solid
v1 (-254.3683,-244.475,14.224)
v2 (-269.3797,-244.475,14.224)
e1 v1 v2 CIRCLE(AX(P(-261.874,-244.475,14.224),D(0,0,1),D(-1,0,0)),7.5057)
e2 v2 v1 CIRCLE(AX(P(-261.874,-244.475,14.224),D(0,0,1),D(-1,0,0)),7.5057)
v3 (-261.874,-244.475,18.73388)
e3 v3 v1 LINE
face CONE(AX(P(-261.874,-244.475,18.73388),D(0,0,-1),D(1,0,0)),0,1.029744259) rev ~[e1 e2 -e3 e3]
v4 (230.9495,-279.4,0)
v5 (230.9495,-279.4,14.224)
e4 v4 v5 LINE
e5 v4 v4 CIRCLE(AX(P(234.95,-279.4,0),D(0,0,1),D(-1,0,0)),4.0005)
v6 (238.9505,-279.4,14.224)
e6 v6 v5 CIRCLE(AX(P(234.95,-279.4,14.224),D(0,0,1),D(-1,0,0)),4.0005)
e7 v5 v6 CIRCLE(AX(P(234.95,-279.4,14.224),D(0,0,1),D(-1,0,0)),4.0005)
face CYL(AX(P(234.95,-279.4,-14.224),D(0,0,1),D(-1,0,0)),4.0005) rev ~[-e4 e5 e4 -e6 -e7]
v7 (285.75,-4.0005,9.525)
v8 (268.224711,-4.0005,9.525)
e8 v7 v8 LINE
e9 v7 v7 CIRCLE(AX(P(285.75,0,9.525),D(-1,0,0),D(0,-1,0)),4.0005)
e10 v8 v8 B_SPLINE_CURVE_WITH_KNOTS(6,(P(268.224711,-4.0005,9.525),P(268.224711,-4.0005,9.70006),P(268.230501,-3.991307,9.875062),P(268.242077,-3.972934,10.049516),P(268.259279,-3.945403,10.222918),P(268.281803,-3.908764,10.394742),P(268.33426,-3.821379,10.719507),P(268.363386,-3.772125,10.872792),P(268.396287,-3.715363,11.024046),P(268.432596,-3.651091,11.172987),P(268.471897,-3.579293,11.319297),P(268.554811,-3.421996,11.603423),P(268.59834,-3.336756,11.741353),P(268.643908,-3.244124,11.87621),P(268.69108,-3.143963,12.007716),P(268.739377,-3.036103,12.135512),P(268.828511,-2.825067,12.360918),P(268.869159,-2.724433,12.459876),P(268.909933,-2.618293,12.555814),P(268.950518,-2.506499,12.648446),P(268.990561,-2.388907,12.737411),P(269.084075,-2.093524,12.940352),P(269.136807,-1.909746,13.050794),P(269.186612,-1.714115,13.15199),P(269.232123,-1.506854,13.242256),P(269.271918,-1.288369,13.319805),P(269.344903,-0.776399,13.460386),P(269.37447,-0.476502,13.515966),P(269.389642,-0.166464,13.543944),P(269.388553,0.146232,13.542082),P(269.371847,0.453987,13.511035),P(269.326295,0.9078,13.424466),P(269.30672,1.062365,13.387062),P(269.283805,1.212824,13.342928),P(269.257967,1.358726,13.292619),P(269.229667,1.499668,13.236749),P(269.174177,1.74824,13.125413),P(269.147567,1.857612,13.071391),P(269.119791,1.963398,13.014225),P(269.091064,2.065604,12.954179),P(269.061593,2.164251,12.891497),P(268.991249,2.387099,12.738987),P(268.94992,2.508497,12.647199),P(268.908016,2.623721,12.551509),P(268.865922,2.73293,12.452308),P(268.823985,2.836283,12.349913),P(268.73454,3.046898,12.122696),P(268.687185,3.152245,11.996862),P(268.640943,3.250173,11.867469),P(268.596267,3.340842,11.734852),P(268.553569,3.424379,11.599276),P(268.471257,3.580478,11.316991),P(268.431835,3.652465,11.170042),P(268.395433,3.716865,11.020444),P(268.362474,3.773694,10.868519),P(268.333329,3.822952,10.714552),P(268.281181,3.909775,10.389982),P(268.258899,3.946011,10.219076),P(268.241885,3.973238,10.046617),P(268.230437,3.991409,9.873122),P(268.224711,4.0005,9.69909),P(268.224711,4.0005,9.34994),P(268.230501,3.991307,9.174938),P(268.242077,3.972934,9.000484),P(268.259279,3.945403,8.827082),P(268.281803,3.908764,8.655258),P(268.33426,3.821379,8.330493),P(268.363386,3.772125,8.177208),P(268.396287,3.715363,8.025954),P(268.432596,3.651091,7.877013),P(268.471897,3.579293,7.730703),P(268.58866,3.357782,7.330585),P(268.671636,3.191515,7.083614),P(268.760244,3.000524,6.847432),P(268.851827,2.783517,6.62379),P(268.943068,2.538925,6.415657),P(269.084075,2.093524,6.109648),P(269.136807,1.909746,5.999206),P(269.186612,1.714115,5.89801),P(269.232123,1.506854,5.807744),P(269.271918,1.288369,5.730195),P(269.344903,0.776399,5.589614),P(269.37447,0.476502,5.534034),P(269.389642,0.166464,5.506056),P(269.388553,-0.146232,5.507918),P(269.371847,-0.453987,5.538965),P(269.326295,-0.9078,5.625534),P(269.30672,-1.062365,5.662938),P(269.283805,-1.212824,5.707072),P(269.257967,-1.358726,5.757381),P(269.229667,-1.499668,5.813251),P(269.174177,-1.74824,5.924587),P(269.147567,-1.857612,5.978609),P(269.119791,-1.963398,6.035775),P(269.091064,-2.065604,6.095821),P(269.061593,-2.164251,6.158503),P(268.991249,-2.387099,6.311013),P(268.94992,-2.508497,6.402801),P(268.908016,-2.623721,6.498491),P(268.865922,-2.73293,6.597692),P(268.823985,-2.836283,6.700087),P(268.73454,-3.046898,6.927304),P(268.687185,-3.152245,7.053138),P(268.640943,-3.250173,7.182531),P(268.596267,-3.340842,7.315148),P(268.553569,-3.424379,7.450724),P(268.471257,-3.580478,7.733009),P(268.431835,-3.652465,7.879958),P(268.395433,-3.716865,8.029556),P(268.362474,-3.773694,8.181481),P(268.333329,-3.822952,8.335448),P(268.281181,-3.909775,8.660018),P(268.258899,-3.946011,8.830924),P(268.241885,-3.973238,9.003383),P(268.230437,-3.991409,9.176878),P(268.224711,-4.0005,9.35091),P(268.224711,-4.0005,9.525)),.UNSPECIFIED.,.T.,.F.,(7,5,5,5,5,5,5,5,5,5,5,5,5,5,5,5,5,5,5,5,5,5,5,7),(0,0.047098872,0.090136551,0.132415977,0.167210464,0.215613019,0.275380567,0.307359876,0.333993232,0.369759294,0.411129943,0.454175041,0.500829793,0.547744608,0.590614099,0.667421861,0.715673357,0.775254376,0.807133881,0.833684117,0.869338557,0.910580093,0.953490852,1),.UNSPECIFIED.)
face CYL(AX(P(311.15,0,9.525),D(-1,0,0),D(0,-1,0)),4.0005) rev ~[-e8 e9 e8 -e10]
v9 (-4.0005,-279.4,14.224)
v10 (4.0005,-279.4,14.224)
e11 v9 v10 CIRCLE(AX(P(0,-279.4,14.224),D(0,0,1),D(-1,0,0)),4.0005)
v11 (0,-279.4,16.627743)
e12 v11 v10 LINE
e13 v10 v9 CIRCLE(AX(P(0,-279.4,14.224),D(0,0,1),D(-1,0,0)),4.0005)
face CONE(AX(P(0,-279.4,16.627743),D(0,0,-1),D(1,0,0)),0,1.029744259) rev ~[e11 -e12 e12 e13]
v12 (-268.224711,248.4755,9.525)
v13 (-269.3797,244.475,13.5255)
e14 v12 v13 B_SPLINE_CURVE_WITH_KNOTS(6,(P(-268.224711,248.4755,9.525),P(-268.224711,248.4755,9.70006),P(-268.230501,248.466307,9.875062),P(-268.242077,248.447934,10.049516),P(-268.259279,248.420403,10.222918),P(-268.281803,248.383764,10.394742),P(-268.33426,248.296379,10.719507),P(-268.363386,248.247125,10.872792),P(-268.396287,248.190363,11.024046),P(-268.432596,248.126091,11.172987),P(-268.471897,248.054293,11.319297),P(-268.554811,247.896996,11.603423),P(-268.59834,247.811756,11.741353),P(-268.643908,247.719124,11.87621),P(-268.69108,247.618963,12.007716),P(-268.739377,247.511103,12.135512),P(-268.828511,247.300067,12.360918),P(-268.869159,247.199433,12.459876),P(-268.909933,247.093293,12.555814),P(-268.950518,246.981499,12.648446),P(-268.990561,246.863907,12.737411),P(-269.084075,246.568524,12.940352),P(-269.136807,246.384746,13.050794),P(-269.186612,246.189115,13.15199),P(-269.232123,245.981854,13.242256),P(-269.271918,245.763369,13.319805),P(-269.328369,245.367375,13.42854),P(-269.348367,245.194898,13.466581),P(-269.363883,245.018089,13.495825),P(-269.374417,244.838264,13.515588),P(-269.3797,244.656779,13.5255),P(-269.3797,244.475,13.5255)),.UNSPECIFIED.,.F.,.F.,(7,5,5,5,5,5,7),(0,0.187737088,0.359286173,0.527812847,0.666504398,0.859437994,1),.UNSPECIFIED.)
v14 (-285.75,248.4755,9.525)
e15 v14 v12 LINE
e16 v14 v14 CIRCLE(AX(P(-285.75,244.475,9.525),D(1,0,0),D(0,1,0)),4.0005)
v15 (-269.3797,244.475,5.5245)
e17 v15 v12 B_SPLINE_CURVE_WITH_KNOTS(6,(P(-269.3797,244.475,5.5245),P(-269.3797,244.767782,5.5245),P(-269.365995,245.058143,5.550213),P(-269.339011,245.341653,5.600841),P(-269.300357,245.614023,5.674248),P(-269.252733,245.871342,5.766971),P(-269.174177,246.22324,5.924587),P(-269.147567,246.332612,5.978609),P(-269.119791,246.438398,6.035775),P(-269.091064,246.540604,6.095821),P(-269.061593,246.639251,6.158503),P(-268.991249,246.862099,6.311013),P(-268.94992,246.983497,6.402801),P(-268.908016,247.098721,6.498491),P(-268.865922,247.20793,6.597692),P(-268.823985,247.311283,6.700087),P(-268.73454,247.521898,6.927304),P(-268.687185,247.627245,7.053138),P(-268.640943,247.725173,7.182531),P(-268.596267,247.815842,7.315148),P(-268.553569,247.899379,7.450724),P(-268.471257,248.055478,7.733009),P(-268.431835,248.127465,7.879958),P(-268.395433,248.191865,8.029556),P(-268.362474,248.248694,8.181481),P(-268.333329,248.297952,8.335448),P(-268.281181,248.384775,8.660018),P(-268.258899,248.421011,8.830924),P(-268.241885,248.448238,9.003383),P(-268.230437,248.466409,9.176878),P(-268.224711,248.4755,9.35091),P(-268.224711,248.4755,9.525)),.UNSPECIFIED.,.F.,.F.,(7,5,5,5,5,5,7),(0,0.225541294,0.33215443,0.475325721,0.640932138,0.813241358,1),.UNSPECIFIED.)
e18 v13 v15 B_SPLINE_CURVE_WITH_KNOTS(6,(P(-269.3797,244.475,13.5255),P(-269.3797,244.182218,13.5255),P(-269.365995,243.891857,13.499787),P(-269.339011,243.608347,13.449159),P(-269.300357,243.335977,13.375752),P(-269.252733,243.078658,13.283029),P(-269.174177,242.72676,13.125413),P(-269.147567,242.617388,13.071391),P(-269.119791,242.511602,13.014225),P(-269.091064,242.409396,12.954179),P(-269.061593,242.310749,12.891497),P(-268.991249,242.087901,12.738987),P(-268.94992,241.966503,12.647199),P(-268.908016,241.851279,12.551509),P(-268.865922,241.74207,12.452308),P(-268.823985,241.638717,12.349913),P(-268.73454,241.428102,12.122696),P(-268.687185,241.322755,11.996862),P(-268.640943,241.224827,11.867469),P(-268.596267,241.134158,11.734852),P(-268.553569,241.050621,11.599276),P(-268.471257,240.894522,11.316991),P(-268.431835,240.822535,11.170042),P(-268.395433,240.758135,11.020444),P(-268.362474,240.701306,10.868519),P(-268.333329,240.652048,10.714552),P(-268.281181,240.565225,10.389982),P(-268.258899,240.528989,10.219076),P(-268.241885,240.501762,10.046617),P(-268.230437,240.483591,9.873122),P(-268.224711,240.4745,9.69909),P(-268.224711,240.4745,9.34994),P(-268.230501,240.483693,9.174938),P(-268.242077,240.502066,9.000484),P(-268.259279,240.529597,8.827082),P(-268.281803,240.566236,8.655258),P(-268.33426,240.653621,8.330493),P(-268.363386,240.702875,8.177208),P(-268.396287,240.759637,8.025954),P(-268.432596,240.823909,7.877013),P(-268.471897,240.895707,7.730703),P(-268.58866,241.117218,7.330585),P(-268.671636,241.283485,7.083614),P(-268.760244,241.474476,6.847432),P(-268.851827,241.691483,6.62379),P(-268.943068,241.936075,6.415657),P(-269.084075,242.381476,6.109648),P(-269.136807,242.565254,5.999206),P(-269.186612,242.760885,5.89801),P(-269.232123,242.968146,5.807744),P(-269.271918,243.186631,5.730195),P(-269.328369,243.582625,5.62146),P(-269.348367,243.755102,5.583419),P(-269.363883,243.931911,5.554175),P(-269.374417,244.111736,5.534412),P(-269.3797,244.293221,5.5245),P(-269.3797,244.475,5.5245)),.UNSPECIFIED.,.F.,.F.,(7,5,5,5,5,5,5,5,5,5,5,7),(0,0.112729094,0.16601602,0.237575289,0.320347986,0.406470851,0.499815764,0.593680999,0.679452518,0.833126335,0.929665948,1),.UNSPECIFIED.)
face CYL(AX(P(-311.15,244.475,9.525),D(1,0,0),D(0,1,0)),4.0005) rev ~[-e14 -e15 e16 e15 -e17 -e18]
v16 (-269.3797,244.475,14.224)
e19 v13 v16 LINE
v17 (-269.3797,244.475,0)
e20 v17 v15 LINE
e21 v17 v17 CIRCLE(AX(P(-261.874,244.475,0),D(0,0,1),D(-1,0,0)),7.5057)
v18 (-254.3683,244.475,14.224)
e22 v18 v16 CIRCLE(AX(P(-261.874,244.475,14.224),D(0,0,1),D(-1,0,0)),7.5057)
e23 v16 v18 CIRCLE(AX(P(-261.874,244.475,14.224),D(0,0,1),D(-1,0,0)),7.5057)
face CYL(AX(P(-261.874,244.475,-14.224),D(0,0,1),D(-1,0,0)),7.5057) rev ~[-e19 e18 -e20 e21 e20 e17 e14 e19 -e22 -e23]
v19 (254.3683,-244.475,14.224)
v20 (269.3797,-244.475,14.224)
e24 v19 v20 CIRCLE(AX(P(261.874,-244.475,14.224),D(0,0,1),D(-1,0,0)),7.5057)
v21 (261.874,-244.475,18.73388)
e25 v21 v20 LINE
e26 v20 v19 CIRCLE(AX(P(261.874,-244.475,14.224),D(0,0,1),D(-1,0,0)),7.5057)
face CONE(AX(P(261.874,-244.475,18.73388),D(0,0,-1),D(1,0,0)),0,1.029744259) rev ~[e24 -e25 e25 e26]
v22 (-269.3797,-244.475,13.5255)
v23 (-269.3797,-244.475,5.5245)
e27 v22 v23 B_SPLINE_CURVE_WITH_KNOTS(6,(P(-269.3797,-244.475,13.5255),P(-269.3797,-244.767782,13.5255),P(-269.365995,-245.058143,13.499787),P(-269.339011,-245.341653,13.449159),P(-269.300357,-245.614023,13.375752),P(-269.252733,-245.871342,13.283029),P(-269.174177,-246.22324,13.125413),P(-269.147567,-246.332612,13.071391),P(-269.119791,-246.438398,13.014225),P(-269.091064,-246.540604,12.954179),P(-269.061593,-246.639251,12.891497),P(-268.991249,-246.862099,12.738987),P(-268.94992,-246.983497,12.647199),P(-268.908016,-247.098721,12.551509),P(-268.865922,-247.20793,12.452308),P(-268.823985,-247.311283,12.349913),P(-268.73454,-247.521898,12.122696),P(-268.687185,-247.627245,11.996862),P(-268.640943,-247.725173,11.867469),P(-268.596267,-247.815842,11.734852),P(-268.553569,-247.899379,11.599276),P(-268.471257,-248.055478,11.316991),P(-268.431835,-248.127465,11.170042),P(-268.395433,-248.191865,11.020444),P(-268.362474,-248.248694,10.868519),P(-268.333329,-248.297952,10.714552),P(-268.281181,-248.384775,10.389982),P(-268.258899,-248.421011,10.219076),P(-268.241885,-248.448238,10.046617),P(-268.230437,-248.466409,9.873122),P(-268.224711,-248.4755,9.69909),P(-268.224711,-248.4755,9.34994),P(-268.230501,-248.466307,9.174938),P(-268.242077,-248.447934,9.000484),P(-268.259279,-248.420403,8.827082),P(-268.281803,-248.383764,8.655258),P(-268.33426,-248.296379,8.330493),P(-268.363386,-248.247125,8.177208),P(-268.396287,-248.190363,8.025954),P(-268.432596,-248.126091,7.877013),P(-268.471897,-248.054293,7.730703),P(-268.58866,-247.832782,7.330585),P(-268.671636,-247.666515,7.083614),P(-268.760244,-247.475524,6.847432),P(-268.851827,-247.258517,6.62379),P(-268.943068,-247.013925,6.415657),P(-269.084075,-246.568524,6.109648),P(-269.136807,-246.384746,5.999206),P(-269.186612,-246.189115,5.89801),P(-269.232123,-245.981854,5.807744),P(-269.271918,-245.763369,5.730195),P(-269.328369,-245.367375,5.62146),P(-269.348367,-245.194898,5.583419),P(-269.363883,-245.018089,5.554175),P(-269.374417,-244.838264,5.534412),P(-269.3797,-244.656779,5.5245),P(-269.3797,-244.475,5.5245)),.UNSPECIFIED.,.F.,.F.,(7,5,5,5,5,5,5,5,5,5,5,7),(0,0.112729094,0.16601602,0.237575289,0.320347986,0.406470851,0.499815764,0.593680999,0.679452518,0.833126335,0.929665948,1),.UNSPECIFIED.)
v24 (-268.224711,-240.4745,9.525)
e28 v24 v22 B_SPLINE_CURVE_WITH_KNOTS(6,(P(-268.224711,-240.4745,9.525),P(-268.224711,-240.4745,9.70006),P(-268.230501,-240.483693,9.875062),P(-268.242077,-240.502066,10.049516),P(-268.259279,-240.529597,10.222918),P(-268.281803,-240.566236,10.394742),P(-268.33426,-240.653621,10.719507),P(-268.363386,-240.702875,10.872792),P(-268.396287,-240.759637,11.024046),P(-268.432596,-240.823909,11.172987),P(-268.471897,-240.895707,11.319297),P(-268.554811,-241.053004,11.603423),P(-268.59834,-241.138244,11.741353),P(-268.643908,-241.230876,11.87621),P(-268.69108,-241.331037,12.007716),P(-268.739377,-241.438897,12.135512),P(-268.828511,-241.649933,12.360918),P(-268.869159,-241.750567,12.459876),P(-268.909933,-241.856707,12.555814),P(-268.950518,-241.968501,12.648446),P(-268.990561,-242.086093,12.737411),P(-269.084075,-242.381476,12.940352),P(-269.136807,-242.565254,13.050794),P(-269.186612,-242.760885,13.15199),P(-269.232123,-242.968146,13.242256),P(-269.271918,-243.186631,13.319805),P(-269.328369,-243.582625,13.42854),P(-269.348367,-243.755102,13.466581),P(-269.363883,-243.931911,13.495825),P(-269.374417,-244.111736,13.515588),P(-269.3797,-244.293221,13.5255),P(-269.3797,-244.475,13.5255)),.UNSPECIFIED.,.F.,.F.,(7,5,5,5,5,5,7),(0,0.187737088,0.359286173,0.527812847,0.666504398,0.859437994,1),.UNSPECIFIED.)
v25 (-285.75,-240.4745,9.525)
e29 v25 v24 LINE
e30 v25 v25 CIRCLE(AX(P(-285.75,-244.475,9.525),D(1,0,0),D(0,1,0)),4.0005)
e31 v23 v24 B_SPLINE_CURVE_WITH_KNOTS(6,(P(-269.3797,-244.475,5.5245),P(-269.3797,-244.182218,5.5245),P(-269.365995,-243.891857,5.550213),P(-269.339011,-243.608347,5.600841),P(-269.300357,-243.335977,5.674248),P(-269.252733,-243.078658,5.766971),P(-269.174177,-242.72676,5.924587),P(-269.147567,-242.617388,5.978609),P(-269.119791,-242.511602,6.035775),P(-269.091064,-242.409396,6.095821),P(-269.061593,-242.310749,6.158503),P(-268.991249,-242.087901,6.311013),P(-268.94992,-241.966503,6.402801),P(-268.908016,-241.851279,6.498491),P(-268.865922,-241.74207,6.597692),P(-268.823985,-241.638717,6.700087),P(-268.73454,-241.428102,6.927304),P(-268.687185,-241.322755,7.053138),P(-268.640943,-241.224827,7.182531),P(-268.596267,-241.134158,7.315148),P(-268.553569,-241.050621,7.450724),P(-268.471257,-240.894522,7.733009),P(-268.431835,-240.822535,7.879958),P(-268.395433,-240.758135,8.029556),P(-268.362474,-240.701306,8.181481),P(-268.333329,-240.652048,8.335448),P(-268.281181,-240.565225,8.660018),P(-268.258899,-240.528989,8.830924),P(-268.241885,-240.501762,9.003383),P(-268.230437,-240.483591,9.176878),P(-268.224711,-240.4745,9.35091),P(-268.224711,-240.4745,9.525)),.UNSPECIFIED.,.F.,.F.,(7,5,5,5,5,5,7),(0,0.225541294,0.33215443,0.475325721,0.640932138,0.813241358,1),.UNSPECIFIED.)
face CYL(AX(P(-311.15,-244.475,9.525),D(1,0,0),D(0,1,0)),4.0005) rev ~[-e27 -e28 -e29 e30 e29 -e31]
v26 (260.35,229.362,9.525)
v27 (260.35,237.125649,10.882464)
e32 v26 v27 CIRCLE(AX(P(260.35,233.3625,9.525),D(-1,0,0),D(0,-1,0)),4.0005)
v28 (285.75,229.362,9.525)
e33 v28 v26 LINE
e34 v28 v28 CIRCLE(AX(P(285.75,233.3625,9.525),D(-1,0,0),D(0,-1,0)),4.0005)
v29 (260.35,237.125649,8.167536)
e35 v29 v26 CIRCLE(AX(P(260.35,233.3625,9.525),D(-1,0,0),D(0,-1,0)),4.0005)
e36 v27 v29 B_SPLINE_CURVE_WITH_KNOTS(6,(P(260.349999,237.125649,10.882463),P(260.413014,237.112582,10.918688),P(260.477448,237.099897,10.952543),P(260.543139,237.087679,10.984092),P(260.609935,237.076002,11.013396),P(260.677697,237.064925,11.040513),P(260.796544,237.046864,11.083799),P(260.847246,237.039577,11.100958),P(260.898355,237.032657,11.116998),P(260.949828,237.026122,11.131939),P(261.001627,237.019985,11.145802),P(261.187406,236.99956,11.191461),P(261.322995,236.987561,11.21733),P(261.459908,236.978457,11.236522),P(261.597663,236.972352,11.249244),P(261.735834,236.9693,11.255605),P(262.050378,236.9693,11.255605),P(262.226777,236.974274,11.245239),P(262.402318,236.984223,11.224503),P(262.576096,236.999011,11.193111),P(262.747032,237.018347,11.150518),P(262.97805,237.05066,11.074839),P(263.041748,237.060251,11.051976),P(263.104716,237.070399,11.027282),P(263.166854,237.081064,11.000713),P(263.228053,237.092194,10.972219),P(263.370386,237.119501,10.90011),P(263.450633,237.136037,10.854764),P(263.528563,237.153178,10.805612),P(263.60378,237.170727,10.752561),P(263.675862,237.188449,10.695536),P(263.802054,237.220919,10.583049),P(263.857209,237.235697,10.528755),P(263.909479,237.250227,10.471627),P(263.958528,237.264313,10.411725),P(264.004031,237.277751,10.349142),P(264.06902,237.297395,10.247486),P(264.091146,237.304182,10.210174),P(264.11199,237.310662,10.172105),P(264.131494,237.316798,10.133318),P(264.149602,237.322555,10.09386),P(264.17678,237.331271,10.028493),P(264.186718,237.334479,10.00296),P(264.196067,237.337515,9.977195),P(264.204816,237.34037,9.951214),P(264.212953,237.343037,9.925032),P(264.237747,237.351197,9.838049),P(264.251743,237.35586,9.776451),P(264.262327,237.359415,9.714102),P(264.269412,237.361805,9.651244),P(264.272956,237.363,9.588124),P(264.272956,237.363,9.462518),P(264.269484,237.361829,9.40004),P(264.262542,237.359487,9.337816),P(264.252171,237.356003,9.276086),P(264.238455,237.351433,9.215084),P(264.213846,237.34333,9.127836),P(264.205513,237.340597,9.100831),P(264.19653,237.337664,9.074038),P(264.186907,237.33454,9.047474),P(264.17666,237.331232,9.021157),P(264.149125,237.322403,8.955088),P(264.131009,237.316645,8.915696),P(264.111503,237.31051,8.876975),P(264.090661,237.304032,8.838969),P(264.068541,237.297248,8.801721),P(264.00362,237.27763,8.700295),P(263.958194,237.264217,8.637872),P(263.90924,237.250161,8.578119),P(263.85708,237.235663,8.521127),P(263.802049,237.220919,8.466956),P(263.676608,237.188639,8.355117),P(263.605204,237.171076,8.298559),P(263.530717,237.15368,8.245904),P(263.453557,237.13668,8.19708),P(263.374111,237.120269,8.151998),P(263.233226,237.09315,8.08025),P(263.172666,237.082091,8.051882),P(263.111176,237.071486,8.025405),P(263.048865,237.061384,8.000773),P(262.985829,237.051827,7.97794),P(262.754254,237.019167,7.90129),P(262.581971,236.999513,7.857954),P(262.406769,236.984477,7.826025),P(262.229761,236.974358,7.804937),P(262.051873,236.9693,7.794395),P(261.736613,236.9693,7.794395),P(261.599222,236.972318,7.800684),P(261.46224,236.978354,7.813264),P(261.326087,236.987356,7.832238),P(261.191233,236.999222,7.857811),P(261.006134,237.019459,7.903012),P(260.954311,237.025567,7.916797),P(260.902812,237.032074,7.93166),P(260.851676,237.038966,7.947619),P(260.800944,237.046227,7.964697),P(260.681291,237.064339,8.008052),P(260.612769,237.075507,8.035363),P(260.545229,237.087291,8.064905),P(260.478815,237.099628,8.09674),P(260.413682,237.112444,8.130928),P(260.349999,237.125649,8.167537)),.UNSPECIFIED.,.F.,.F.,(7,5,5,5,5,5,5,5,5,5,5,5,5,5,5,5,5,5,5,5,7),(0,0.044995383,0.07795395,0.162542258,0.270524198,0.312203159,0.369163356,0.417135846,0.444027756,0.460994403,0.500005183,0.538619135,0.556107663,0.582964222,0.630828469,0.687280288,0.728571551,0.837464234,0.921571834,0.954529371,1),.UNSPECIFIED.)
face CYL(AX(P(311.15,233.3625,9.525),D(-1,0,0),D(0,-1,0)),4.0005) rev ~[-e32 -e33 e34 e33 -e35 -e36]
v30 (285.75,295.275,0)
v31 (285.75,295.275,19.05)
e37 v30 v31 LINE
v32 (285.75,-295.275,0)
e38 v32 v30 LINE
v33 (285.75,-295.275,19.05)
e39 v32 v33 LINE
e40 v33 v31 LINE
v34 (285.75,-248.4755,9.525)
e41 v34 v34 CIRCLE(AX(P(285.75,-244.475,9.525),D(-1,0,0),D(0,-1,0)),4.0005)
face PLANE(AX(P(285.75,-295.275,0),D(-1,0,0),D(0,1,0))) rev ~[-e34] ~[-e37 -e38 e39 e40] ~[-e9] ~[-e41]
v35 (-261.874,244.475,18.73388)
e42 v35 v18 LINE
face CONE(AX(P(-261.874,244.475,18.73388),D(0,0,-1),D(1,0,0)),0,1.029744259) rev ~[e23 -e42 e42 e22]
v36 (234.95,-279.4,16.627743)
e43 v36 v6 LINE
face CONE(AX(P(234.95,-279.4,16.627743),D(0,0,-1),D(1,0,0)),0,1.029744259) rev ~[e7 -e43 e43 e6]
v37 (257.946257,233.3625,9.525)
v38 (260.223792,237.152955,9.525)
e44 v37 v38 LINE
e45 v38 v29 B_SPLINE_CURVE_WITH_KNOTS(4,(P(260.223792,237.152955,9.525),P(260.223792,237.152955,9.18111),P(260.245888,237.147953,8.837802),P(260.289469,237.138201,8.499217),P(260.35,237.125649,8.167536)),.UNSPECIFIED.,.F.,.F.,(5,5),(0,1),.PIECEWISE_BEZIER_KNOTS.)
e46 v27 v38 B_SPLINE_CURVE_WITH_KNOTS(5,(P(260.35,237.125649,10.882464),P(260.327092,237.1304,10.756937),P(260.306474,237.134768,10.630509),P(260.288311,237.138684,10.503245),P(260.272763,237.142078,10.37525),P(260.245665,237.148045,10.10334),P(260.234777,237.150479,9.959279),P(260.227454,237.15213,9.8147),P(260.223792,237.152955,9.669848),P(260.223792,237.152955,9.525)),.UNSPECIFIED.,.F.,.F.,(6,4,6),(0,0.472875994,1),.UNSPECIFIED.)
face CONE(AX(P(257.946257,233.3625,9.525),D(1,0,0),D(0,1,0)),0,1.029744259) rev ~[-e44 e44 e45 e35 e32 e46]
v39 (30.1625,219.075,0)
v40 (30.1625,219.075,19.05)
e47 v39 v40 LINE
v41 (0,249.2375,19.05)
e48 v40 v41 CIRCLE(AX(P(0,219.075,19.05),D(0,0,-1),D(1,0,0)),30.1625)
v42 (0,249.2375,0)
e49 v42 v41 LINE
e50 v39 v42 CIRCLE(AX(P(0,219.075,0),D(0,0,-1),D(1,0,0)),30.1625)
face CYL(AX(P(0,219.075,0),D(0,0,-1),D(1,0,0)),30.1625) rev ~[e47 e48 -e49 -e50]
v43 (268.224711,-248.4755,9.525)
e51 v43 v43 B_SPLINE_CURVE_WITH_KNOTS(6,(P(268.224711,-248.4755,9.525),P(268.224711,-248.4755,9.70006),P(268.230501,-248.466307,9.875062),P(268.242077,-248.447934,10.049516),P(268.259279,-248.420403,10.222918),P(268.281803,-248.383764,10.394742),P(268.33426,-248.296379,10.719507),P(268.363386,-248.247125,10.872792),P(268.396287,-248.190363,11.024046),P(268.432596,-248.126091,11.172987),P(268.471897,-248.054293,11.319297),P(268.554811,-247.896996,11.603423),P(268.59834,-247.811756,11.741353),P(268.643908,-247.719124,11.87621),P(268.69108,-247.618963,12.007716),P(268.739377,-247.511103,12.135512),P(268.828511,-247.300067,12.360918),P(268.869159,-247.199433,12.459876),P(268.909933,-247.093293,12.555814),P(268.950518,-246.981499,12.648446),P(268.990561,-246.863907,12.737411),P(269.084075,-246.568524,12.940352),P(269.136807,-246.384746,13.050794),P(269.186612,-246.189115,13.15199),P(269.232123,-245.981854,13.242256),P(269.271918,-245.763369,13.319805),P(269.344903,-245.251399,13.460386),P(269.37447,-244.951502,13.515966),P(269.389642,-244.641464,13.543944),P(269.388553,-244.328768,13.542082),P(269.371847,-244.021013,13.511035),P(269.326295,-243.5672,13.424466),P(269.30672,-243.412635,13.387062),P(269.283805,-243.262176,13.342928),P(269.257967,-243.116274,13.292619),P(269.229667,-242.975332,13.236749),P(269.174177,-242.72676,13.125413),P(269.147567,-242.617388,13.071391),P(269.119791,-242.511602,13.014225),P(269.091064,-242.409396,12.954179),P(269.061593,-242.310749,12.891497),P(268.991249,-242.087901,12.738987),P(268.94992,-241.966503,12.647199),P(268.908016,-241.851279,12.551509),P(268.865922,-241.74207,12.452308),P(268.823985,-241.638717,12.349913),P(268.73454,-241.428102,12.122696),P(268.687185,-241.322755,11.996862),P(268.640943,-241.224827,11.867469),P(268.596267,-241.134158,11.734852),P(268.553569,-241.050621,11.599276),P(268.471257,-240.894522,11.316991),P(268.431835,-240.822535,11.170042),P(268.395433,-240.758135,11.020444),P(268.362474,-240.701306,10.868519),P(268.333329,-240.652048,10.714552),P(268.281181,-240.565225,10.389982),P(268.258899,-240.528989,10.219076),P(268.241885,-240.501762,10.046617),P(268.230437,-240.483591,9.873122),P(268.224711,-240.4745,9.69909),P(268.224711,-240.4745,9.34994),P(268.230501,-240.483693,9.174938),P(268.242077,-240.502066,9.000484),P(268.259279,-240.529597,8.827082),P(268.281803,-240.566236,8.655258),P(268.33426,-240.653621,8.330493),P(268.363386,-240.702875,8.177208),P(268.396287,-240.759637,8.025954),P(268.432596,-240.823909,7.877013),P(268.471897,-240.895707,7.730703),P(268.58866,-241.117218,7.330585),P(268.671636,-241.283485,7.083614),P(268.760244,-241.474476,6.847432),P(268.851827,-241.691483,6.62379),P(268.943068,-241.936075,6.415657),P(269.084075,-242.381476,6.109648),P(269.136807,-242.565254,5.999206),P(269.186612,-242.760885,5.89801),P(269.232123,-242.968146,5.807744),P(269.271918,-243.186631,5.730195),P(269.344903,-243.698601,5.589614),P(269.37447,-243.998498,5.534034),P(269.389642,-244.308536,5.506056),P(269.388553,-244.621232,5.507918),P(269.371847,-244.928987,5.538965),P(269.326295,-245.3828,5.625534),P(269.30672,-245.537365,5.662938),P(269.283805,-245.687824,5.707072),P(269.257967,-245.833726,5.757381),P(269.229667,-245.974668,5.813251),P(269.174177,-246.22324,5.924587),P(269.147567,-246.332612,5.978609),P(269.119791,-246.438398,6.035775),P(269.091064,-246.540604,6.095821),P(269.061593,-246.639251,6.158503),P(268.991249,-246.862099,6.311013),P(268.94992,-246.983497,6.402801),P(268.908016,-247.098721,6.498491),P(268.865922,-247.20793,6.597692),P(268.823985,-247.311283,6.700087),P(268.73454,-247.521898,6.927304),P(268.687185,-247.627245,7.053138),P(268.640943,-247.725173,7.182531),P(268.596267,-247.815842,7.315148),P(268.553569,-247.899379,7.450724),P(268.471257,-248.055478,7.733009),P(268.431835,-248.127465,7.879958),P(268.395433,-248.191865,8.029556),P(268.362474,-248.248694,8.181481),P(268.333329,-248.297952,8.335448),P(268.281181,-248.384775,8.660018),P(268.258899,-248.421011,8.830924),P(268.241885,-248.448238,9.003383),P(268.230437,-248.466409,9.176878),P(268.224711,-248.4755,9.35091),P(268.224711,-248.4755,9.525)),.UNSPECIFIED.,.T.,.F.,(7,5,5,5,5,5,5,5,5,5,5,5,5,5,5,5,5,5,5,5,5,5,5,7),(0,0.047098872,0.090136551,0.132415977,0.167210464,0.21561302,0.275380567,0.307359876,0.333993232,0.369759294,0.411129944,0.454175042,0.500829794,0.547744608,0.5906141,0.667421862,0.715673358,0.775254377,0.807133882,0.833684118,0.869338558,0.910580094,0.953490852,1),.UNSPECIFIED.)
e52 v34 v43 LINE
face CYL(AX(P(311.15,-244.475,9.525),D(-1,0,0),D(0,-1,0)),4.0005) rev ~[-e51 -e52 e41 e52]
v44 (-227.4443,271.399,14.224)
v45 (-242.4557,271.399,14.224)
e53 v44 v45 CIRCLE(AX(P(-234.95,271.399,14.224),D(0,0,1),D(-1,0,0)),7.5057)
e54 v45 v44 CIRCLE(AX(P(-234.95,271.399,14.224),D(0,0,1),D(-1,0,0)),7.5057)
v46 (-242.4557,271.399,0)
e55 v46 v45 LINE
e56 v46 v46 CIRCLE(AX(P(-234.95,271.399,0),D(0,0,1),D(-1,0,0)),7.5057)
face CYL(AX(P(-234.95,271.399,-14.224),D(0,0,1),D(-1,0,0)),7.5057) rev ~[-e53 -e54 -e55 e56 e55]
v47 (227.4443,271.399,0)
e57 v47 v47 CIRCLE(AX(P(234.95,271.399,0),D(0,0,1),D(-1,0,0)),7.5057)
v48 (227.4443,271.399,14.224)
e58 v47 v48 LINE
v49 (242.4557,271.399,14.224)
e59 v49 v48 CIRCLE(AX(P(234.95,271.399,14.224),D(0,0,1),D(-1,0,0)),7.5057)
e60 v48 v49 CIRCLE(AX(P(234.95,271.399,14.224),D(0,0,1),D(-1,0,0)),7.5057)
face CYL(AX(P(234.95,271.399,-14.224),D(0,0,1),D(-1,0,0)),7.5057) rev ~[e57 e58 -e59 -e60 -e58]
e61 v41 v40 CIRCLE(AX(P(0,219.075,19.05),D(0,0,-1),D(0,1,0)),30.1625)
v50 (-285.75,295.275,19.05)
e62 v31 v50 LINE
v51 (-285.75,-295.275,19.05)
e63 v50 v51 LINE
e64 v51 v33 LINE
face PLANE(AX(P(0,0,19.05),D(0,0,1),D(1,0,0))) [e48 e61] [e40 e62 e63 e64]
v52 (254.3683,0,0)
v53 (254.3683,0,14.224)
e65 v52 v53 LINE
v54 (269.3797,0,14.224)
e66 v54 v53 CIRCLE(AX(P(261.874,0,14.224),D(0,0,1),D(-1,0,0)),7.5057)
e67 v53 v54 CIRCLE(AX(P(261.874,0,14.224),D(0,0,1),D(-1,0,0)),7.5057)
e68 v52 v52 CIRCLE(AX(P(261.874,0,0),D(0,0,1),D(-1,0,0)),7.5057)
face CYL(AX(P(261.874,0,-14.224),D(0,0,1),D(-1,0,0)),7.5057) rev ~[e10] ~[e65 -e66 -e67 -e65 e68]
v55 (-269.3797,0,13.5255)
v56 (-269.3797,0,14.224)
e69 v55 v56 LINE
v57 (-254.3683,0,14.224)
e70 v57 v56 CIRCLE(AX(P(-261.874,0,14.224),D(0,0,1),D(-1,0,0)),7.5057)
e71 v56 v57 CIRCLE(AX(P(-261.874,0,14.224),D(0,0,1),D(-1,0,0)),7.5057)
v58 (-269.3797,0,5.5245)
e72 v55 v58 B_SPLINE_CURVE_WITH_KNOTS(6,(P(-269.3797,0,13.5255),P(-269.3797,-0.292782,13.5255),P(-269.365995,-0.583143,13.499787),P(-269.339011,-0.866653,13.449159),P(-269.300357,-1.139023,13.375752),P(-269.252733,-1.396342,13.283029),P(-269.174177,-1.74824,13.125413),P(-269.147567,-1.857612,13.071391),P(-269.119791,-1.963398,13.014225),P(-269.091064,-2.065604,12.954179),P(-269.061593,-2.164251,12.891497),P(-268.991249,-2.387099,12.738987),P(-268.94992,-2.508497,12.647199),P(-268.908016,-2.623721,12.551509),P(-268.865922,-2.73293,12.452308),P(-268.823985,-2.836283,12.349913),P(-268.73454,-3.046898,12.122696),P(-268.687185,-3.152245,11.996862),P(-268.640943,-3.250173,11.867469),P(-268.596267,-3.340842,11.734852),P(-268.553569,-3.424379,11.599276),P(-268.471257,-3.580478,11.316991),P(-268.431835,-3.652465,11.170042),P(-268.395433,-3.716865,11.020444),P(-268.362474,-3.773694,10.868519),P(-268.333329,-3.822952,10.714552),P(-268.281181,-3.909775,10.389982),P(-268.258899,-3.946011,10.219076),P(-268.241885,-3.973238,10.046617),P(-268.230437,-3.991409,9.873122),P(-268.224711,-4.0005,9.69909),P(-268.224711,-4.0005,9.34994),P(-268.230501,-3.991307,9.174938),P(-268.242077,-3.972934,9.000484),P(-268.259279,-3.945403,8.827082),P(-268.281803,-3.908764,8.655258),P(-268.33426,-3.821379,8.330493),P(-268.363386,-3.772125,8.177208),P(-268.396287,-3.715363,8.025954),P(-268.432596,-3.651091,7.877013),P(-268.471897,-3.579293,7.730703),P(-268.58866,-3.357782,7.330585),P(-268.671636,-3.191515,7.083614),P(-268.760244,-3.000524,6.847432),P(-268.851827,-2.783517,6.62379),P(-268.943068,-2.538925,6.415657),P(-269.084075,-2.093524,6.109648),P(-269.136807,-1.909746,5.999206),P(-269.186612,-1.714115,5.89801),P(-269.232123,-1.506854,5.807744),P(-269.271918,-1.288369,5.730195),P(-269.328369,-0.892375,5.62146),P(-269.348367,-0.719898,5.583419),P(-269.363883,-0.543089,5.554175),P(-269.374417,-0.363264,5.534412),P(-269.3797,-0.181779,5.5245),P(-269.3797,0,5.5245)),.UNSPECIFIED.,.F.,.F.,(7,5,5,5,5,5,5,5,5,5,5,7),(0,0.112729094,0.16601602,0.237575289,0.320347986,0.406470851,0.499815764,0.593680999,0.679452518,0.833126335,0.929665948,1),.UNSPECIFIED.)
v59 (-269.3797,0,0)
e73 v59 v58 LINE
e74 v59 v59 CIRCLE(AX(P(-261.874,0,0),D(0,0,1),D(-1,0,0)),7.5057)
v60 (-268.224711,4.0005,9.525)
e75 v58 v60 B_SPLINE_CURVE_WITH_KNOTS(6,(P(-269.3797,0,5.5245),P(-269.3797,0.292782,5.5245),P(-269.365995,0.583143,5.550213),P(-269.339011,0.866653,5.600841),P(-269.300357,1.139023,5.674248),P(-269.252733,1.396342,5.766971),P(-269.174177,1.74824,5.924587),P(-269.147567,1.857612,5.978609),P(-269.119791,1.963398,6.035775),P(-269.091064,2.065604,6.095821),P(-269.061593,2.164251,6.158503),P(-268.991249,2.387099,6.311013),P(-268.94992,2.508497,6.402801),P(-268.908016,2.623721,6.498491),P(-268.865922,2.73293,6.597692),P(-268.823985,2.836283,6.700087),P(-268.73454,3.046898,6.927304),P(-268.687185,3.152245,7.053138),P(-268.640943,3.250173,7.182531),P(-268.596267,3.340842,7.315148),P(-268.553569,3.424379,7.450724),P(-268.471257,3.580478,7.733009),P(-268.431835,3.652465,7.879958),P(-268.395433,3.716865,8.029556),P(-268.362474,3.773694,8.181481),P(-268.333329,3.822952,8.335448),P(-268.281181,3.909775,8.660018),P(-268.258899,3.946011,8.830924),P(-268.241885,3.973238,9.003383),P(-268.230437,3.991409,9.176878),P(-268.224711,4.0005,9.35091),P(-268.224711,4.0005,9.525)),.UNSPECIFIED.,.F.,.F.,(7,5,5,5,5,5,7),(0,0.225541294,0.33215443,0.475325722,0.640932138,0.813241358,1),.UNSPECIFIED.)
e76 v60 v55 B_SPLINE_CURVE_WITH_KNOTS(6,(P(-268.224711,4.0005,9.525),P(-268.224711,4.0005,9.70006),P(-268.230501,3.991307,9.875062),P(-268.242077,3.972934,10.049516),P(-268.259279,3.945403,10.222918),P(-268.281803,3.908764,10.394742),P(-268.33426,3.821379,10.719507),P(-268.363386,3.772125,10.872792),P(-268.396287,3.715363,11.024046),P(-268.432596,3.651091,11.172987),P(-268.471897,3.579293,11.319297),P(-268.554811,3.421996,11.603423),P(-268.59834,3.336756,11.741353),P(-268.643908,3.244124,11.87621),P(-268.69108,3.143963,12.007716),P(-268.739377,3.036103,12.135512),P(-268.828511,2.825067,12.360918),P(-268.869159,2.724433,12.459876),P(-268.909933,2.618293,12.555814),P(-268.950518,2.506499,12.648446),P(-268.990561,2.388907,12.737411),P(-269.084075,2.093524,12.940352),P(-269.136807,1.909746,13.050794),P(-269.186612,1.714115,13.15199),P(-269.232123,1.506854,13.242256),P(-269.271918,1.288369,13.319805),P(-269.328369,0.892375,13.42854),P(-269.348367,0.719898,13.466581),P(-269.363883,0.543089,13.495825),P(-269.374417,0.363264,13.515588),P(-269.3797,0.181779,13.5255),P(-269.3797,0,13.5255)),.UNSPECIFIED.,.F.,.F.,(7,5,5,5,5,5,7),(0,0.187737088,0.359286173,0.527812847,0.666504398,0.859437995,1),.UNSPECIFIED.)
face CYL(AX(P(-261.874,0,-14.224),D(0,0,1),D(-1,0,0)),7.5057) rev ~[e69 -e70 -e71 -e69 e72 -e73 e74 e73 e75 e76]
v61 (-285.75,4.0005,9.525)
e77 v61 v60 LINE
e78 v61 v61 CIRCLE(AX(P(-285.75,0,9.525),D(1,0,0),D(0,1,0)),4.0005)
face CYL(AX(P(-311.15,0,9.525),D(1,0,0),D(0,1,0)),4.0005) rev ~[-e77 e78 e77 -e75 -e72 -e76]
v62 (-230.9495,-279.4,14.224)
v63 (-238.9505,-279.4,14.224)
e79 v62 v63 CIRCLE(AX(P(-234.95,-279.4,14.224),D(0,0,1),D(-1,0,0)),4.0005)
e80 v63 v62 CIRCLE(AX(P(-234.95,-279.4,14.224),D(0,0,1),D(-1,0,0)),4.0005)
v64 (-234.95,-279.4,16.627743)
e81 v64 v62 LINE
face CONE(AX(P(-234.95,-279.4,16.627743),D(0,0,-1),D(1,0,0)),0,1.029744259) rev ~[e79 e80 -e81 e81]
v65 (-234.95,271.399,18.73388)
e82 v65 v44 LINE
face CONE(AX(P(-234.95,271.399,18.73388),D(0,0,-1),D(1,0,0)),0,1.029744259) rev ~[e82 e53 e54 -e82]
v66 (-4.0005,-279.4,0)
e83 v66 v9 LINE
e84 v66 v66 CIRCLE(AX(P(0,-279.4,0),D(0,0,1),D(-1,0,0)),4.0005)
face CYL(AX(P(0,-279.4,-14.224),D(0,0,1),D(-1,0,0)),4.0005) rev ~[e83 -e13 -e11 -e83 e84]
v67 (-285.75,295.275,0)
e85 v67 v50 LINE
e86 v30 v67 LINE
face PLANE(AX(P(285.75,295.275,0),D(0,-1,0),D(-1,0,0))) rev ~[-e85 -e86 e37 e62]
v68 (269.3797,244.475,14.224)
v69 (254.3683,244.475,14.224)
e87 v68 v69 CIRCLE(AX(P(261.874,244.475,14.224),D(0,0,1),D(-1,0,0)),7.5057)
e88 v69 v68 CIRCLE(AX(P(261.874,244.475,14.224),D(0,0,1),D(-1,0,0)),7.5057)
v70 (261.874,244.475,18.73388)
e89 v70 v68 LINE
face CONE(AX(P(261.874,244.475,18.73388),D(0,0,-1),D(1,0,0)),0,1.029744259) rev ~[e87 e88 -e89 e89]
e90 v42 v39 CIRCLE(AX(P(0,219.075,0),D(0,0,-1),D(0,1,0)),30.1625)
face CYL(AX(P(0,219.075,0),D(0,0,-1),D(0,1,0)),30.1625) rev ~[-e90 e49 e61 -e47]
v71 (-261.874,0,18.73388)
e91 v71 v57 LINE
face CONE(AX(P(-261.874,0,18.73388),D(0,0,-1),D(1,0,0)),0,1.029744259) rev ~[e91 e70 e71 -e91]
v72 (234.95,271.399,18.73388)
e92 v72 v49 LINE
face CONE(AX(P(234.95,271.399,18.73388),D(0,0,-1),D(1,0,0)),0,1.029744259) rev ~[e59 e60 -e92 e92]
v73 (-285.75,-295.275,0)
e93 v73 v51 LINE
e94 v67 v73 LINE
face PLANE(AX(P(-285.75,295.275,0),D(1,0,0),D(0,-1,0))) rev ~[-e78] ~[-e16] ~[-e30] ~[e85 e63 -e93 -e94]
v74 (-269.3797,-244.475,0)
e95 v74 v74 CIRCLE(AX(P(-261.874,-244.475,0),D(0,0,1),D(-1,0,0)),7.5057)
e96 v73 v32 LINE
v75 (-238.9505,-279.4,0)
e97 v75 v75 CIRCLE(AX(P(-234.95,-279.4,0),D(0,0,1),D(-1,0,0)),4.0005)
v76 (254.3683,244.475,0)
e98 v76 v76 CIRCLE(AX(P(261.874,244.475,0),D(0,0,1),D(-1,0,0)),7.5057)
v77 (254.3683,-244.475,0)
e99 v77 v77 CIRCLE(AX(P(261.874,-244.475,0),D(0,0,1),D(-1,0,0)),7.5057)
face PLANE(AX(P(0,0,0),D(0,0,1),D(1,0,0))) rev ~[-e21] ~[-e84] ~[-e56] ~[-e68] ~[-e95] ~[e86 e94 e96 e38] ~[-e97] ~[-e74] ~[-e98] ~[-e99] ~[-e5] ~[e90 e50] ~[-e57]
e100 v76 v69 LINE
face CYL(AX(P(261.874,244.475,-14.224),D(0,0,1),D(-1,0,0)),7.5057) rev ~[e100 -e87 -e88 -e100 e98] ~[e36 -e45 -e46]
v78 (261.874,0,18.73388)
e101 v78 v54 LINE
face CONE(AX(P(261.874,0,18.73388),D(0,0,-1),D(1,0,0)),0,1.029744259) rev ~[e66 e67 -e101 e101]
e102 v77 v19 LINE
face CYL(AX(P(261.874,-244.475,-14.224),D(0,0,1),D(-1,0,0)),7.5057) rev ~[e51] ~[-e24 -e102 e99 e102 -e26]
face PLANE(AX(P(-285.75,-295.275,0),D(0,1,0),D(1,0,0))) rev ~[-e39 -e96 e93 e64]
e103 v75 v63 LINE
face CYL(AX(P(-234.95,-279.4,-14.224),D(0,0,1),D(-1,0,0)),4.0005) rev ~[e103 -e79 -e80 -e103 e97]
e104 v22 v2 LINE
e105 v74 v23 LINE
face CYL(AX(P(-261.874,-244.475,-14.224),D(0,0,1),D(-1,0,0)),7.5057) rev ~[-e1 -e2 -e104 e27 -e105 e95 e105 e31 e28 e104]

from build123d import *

# Parameters (mm, degrees)
F1_DEPTH  = 19.05
F3_D      = 15.0114
F3_DEPTH  = 14.224
F3_TIP    = 4.5098795482
F5_D      = 8.001
F5_DEPTH  = 25.4
F5_TIP    = 2.4037429064
F7_D      = 8.001
F7_DEPTH  = 25.4
F7_TIP    = 2.4037429064
F9_D      = 8.001
F9_DEPTH  = 14.224
F9_TIP    = 2.4037429064
F11_D     = 15.0114
F11_DEPTH = 14.224
F11_TIP   = 4.5098795482


# Not quite as in the source:
# - a feature names something its author has since deleted; it is built from what else it names


with BuildPart() as f1:
    # F0 (on Top) → F1 (new body)
    with BuildSketch(Plane.XY):
        Polygon((285.75, -295.275), (285.75, 295.275), (0, 295.275), (-285.75, 295.275), (-285.75, -295.275), align=None)
        with BuildLine():
            ThreePointArc((30.1625, 219.075), (-21.3281082875, 197.7468917125), (0, 249.2375))
            ThreePointArc((0, 249.2375), (21.3281082875, 240.4031082875), (30.1625, 219.075))
        make_face(mode=Mode.SUBTRACT)
    extrude(amount=F1_DEPTH)

    # F3
    with Locations(Plane(origin=(0, 0, 0), x_dir=(1, 0, 0), z_dir=(0, 0, -1))):
        with Locations((-261.874, 244.475), (261.874, 244.475), (-261.874, 0), (261.874, 0), (261.874, -244.475), (-261.874, -244.475)):
            Hole(F3_D / 2, depth=F3_DEPTH)
            with Locations((0, 0, -(F3_DEPTH + F3_TIP / 2))):  # 118° drill point
                Cone(0, F3_D / 2, F3_TIP, mode=Mode.SUBTRACT)

    # F5
    with Locations(Plane.YZ.offset(285.75)):
        with Locations((-244.475, 9.525), (0, 9.525), (233.3625, 9.525)):
            Hole(F5_D / 2, depth=F5_DEPTH)
            with Locations((0, 0, -(F5_DEPTH + F5_TIP / 2))):  # 118° drill point
                Cone(0, F5_D / 2, F5_TIP, mode=Mode.SUBTRACT)

    # F7
    with Locations(Plane(origin=(-285.75, 0, 0), x_dir=(0, -1, 0), z_dir=(-1, 0, 0))):
        with Locations((0, 9.525), (244.475, 9.525), (-244.475, 9.525)):
            Hole(F7_D / 2, depth=F7_DEPTH)
            with Locations((0, 0, -(F7_DEPTH + F7_TIP / 2))):  # 118° drill point
                Cone(0, F7_D / 2, F7_TIP, mode=Mode.SUBTRACT)

    # F9
    with Locations(Plane(origin=(0, 0, 0), x_dir=(1, 0, 0), z_dir=(0, 0, -1))):
        with Locations((-234.95, 279.4), (0, 279.4), (234.95, 279.4)):
            Hole(F9_D / 2, depth=F9_DEPTH)
            with Locations((0, 0, -(F9_DEPTH + F9_TIP / 2))):  # 118° drill point
                Cone(0, F9_D / 2, F9_TIP, mode=Mode.SUBTRACT)

    # F11
    with Locations(Plane(origin=(0, 0, 0), x_dir=(1, 0, 0), z_dir=(0, 0, -1))):
        with Locations((-234.95, -271.399), (234.95, -271.399)):
            Hole(F11_D / 2, depth=F11_DEPTH)
            with Locations((0, 0, -(F11_DEPTH + F11_TIP / 2))):  # 118° drill point
                Cone(0, F11_D / 2, F11_TIP, mode=Mode.SUBTRACT)


solid = f1.part
